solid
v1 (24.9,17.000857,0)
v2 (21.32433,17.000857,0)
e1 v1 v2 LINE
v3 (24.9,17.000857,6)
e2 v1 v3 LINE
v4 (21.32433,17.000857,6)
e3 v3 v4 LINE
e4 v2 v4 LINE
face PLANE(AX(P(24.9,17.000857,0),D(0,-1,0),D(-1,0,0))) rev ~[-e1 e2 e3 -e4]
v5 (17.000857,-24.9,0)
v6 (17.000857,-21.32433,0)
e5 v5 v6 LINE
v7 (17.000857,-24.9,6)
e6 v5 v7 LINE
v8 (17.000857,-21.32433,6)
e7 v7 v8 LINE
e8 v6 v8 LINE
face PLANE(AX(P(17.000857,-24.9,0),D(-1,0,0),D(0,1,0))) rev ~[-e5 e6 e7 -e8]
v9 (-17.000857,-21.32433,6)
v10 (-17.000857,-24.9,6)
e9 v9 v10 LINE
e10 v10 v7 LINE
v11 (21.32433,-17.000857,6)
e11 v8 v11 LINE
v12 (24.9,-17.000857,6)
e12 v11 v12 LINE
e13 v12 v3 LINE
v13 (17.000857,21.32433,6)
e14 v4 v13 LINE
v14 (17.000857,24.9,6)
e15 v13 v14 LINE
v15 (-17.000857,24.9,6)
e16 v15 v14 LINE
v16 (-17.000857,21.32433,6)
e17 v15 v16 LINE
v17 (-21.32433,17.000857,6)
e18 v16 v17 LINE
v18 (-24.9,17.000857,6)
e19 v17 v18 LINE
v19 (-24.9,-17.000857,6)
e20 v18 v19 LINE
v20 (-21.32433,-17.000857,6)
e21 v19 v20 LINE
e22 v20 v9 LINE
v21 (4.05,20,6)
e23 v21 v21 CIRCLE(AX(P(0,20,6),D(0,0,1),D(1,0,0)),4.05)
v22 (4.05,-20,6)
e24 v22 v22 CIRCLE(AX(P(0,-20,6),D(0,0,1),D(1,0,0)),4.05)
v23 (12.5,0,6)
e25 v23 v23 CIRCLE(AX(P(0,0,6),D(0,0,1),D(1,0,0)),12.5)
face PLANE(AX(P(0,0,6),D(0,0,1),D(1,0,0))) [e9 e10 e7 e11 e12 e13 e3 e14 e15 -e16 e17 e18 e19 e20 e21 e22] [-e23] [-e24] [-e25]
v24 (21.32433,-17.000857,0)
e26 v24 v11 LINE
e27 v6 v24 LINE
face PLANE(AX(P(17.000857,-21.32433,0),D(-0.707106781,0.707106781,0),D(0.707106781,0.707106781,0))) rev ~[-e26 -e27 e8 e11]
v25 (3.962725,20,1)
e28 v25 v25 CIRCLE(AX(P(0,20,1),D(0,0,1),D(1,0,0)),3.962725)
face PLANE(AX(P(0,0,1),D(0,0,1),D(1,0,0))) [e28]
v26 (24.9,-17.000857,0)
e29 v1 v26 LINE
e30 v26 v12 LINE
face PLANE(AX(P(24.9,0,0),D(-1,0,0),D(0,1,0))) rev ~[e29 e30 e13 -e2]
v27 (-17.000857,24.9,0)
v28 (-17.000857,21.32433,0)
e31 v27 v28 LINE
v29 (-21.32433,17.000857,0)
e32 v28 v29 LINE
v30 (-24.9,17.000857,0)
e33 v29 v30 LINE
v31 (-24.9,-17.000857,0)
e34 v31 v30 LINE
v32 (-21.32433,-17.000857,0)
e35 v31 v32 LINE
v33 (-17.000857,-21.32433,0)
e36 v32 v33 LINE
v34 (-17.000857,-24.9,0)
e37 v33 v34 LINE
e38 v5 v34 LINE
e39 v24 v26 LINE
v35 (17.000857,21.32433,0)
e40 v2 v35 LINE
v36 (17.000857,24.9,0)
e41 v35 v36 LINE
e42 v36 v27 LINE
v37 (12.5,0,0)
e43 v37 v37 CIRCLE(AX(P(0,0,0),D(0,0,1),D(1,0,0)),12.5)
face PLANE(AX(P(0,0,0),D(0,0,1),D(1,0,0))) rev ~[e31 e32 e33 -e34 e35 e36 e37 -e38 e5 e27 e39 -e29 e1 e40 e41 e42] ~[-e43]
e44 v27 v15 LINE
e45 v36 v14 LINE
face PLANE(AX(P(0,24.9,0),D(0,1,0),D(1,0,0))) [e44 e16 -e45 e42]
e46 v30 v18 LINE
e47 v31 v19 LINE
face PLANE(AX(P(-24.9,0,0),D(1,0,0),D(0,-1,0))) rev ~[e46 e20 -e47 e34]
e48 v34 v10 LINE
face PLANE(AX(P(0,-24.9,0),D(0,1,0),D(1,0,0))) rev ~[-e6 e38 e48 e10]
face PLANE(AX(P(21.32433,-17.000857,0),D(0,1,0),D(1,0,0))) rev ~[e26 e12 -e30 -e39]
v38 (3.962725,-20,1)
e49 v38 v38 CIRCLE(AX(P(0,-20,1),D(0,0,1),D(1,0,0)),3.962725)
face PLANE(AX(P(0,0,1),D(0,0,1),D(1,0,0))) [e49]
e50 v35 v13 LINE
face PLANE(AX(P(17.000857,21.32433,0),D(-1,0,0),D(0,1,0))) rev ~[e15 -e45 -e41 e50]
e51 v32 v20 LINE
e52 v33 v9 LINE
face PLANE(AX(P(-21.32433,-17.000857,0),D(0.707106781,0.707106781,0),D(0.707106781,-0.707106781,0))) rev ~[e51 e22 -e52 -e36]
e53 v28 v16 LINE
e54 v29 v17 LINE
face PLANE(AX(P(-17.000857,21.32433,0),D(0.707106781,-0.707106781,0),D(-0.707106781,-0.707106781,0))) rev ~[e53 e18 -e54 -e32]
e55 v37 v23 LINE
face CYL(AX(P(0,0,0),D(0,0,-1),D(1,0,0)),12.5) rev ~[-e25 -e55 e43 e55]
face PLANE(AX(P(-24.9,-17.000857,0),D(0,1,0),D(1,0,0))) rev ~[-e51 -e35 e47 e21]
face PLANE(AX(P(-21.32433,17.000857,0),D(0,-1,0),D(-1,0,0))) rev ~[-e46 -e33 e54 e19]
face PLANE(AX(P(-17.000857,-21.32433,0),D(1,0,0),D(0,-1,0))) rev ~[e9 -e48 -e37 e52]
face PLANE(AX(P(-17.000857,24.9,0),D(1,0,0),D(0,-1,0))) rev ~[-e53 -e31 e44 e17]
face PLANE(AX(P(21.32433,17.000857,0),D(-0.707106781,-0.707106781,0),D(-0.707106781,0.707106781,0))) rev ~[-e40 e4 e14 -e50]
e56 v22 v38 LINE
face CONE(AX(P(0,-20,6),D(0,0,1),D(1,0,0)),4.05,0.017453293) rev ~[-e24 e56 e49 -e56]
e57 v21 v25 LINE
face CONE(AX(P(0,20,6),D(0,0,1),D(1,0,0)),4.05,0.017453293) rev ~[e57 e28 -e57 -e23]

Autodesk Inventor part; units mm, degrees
ref_plane "YZ Plane" through (0, 0, 0) normal (1, 0, 0) x (0, 1, 0)
ref_plane "XZ Plane" through (0, 0, 0) normal (0, 1, 0) x (-1, 0, 0)
ref_plane "XY Plane" through (0, 0, 0) normal (0, 0, 1) x (1, 0, 0)
sketch "Sketch1" plane through (0, 0, 0) normal (0, 0, 1) x (1, 0, 0)
  line L0 (-34.86, 0) -> (34.86, 0) construction
  line L1 (0, -34.86) -> (0, 34.86) construction
  line L2 (0, 0) -> (11.157509, 11.157509) construction
  line L3 (0, 0) -> (15.7791, 0) construction
  line L4 (0, 24.9) -> (16.800857, 24.9)
  line L5 (16.800857, 24.9) -> (16.800857, 21.241488)
  line L6 (16.800857, 21.241488) -> (19.021172, 19.021172)
  line L7 (24.9, 0) -> (24.9, 16.800857)
  line L8 (24.9, 16.800857) -> (21.241488, 16.800857)
  line L9 (21.241488, 16.800857) -> (19.021172, 19.021172)
  line L10 (0, -24.9) -> (16.800857, -24.9)
  line L11 (16.800857, -24.9) -> (16.800857, -21.241488)
  line L12 (16.800857, -21.241488) -> (19.021172, -19.021172)
  line L13 (24.9, 0) -> (24.9, -16.800857)
  line L14 (24.9, -16.800857) -> (21.241488, -16.800857)
  line L15 (21.241488, -16.800857) -> (19.021172, -19.021172)
  line L16 (0, 24.9) -> (-16.800857, 24.9)
  line L17 (-16.800857, 24.9) -> (-16.800857, 21.241488)
  line L18 (-16.800857, 21.241488) -> (-19.021172, 19.021172)
  line L19 (-24.9, 16.800857) -> (-21.241488, 16.800857)
  line L20 (-21.241488, 16.800857) -> (-19.021172, 19.021172)
  line L21 (0, -24.9) -> (-16.800857, -24.9)
  line L22 (-16.800857, -24.9) -> (-16.800857, -21.241488)
  line L23 (-16.800857, -21.241488) -> (-19.021172, -19.021172)
  line L24 (-21.241488, -16.800857) -> (-19.021172, -19.021172)
  line L25 (-24.9, -16.800857) -> (-21.241488, -16.800857)
  line L26 (-24.9, 0) -> (-24.9, -16.800857)
  line L27 (-24.9, 0) -> (-24.9, 16.800857)
  circle A0 centre (0, 0) radius 12.5
  dimension "d0" = 45
  dimension "d2" = 24.9
  dimension "d3" = 3.14
  dimension "d4" = 26.9
  dimension "d5" = 25
extrude "Extrusion1" add sketch "Sketch1" along normal blind 6
sketch "Sketch4" plane through (0, 0, 0) normal (0, 0, -1) x (-1, 0, 0)
  circle A0 centre (0, 0) radius 12.5 construction
  line L0 (16.800857, 24.9) -> (-16.800857, 24.9) construction
  line L1 (-16.800857, 24.9) -> (-16.800857, 21.241488)
  line L2 (-16.800857, 21.241488) -> (-21.241488, 16.800857)
  line L3 (-21.241488, 16.800857) -> (-24.9, 16.800857)
  line L4 (-24.9, 16.800857) -> (-24.9, -16.800857) construction
  line L5 (-24.9, -16.800857) -> (-21.241488, -16.800857)
  line L6 (-21.241488, -16.800857) -> (-16.800857, -21.241488)
  line L7 (-16.800857, -21.241488) -> (-16.800857, -24.9)
  line L8 (-16.800857, -24.9) -> (16.800857, -24.9) construction
  line L9 (16.800857, -24.9) -> (16.800857, -21.241488)
  line L10 (16.800857, -21.241488) -> (21.241488, -16.800857)
  line L11 (21.241488, -16.800857) -> (24.9, -16.800857)
  line L12 (24.9, -16.800857) -> (24.9, 16.800857) construction
  line L13 (24.9, 16.800857) -> (21.241488, 16.800857)
  line L14 (21.241488, 16.800857) -> (16.800857, 21.241488)
  line L15 (16.800857, 21.241488) -> (16.800857, 24.9)
  line L16 (-17.000857, 25.1) -> (17.000857, 25.1) construction
  line L17 (17.000857, 25.1) -> (17.000857, 21.32433)
  line L18 (17.000857, 21.32433) -> (21.32433, 17.000857)
  line L19 (21.32433, 17.000857) -> (25.1, 17.000857)
  line L20 (25.1, 17.000857) -> (25.1, -17.000857) construction
  line L21 (25.1, -17.000857) -> (21.32433, -17.000857)
  line L22 (21.32433, -17.000857) -> (17.000857, -21.32433)
  line L23 (17.000857, -21.32433) -> (17.000857, -25.1)
  line L24 (17.000857, -25.1) -> (-17.000857, -25.1) construction
  line L25 (-17.000857, -25.1) -> (-17.000857, -21.32433)
  line L26 (-17.000857, -21.32433) -> (-21.32433, -17.000857)
  line L27 (-21.32433, -17.000857) -> (-25.1, -17.000857)
  line L28 (-25.1, -17.000857) -> (-25.1, 17.000857) construction
  line L29 (-25.1, 17.000857) -> (-21.32433, 17.000857)
  line L30 (-21.32433, 17.000857) -> (-17.000857, 21.32433)
  line L31 (-17.000857, 21.32433) -> (-17.000857, 25.1)
  line L32 (-24.9, -16.800857) -> (-24.9, 16.800857)
  line L33 (-24.9, 16.800857) -> (-24.9, 17.000857)
  line L34 (-16.800857, 24.9) -> (-17.000857, 24.9)
  line L35 (-16.800857, 24.9) -> (16.800857, 24.9)
  line L36 (16.800857, 24.9) -> (17.000857, 24.9)
  line L37 (24.9, 16.800857) -> (24.9, 17.000857)
  line L38 (24.9, 16.800857) -> (24.9, -16.800857)
  line L39 (24.9, -16.800857) -> (24.9, -17.000857)
  line L40 (16.800857, -24.9) -> (-16.800857, -24.9)
  line L41 (16.800857, -24.9) -> (17.000857, -24.9)
  line L42 (-16.800857, -24.9) -> (-17.000857, -24.9)
  line L43 (-24.9, -16.800857) -> (-24.9, -17.000857)
  dimension "d19" = 0.2
extrude "IM_offset" add sketch "Sketch4" against normal up to surface (6 mm away) contours L1 L2 L3 L33 L29 L30 L31 L34 | L36 L17 L18 L19 L37 L13 L14 L15 | L5 L6 L7 L42 L25 L26 L27 L43 | L39 L21 L22 L23 L41 L9 L10 L11
sketch "Skizze5" plane through (0, 0, 6) normal (0, 0, 1) x (1, 0, 0)
  circle A0 centre (0, 0) radius 12.5
  line L0 (-17.000857, 24.9) -> (17.000857, 24.9)
  line L1 (-17.000857, 21.32433) -> (-17.000857, 24.9)
  line L2 (-21.32433, 17.000857) -> (-17.000857, 21.32433)
  line L3 (-24.9, 17.000857) -> (-21.32433, 17.000857)
  line L4 (-24.9, -17.000857) -> (-24.9, 17.000857)
  line L5 (-21.32433, -17.000857) -> (-24.9, -17.000857)
  line L6 (-17.000857, -21.32433) -> (-21.32433, -17.000857)
  line L7 (-17.000857, -24.9) -> (-17.000857, -21.32433)
  line L8 (17.000857, -24.9) -> (-17.000857, -24.9)
  line L9 (17.000857, -21.32433) -> (17.000857, -24.9)
  line L10 (21.32433, -17.000857) -> (17.000857, -21.32433)
  line L11 (24.9, -17.000857) -> (21.32433, -17.000857)
  line L12 (24.9, 17.000857) -> (24.9, -17.000857)
  line L13 (21.32433, 17.000857) -> (24.9, 17.000857)
  line L14 (17.000857, 21.32433) -> (21.32433, 17.000857)
  line L15 (17.000857, 24.9) -> (17.000857, 21.32433)
  circle A1 centre (0, 0) radius 20
  circle A2 centre (0, 20) radius 4.05
  circle A3 centre (0, -20) radius 4.05
  dimension "d22" = 40
  dimension "d23" = 8.1
  dimension "d24" = 8.1
sketch "Skizze5 outline for Extrusion4" plane through (0, 0, 6) normal (0, 0, 1) x (1, 0, 0)
  circle A0 centre (0, -20) radius 4.05
  circle A1 centre (0, 20) radius 4.05
extrude "Extrusion4" cut sketch "Skizze5 outline for Extrusion4" against normal blind 5 draft -1
properties part number "20_Cube_insert_Sample_holder_v3"
